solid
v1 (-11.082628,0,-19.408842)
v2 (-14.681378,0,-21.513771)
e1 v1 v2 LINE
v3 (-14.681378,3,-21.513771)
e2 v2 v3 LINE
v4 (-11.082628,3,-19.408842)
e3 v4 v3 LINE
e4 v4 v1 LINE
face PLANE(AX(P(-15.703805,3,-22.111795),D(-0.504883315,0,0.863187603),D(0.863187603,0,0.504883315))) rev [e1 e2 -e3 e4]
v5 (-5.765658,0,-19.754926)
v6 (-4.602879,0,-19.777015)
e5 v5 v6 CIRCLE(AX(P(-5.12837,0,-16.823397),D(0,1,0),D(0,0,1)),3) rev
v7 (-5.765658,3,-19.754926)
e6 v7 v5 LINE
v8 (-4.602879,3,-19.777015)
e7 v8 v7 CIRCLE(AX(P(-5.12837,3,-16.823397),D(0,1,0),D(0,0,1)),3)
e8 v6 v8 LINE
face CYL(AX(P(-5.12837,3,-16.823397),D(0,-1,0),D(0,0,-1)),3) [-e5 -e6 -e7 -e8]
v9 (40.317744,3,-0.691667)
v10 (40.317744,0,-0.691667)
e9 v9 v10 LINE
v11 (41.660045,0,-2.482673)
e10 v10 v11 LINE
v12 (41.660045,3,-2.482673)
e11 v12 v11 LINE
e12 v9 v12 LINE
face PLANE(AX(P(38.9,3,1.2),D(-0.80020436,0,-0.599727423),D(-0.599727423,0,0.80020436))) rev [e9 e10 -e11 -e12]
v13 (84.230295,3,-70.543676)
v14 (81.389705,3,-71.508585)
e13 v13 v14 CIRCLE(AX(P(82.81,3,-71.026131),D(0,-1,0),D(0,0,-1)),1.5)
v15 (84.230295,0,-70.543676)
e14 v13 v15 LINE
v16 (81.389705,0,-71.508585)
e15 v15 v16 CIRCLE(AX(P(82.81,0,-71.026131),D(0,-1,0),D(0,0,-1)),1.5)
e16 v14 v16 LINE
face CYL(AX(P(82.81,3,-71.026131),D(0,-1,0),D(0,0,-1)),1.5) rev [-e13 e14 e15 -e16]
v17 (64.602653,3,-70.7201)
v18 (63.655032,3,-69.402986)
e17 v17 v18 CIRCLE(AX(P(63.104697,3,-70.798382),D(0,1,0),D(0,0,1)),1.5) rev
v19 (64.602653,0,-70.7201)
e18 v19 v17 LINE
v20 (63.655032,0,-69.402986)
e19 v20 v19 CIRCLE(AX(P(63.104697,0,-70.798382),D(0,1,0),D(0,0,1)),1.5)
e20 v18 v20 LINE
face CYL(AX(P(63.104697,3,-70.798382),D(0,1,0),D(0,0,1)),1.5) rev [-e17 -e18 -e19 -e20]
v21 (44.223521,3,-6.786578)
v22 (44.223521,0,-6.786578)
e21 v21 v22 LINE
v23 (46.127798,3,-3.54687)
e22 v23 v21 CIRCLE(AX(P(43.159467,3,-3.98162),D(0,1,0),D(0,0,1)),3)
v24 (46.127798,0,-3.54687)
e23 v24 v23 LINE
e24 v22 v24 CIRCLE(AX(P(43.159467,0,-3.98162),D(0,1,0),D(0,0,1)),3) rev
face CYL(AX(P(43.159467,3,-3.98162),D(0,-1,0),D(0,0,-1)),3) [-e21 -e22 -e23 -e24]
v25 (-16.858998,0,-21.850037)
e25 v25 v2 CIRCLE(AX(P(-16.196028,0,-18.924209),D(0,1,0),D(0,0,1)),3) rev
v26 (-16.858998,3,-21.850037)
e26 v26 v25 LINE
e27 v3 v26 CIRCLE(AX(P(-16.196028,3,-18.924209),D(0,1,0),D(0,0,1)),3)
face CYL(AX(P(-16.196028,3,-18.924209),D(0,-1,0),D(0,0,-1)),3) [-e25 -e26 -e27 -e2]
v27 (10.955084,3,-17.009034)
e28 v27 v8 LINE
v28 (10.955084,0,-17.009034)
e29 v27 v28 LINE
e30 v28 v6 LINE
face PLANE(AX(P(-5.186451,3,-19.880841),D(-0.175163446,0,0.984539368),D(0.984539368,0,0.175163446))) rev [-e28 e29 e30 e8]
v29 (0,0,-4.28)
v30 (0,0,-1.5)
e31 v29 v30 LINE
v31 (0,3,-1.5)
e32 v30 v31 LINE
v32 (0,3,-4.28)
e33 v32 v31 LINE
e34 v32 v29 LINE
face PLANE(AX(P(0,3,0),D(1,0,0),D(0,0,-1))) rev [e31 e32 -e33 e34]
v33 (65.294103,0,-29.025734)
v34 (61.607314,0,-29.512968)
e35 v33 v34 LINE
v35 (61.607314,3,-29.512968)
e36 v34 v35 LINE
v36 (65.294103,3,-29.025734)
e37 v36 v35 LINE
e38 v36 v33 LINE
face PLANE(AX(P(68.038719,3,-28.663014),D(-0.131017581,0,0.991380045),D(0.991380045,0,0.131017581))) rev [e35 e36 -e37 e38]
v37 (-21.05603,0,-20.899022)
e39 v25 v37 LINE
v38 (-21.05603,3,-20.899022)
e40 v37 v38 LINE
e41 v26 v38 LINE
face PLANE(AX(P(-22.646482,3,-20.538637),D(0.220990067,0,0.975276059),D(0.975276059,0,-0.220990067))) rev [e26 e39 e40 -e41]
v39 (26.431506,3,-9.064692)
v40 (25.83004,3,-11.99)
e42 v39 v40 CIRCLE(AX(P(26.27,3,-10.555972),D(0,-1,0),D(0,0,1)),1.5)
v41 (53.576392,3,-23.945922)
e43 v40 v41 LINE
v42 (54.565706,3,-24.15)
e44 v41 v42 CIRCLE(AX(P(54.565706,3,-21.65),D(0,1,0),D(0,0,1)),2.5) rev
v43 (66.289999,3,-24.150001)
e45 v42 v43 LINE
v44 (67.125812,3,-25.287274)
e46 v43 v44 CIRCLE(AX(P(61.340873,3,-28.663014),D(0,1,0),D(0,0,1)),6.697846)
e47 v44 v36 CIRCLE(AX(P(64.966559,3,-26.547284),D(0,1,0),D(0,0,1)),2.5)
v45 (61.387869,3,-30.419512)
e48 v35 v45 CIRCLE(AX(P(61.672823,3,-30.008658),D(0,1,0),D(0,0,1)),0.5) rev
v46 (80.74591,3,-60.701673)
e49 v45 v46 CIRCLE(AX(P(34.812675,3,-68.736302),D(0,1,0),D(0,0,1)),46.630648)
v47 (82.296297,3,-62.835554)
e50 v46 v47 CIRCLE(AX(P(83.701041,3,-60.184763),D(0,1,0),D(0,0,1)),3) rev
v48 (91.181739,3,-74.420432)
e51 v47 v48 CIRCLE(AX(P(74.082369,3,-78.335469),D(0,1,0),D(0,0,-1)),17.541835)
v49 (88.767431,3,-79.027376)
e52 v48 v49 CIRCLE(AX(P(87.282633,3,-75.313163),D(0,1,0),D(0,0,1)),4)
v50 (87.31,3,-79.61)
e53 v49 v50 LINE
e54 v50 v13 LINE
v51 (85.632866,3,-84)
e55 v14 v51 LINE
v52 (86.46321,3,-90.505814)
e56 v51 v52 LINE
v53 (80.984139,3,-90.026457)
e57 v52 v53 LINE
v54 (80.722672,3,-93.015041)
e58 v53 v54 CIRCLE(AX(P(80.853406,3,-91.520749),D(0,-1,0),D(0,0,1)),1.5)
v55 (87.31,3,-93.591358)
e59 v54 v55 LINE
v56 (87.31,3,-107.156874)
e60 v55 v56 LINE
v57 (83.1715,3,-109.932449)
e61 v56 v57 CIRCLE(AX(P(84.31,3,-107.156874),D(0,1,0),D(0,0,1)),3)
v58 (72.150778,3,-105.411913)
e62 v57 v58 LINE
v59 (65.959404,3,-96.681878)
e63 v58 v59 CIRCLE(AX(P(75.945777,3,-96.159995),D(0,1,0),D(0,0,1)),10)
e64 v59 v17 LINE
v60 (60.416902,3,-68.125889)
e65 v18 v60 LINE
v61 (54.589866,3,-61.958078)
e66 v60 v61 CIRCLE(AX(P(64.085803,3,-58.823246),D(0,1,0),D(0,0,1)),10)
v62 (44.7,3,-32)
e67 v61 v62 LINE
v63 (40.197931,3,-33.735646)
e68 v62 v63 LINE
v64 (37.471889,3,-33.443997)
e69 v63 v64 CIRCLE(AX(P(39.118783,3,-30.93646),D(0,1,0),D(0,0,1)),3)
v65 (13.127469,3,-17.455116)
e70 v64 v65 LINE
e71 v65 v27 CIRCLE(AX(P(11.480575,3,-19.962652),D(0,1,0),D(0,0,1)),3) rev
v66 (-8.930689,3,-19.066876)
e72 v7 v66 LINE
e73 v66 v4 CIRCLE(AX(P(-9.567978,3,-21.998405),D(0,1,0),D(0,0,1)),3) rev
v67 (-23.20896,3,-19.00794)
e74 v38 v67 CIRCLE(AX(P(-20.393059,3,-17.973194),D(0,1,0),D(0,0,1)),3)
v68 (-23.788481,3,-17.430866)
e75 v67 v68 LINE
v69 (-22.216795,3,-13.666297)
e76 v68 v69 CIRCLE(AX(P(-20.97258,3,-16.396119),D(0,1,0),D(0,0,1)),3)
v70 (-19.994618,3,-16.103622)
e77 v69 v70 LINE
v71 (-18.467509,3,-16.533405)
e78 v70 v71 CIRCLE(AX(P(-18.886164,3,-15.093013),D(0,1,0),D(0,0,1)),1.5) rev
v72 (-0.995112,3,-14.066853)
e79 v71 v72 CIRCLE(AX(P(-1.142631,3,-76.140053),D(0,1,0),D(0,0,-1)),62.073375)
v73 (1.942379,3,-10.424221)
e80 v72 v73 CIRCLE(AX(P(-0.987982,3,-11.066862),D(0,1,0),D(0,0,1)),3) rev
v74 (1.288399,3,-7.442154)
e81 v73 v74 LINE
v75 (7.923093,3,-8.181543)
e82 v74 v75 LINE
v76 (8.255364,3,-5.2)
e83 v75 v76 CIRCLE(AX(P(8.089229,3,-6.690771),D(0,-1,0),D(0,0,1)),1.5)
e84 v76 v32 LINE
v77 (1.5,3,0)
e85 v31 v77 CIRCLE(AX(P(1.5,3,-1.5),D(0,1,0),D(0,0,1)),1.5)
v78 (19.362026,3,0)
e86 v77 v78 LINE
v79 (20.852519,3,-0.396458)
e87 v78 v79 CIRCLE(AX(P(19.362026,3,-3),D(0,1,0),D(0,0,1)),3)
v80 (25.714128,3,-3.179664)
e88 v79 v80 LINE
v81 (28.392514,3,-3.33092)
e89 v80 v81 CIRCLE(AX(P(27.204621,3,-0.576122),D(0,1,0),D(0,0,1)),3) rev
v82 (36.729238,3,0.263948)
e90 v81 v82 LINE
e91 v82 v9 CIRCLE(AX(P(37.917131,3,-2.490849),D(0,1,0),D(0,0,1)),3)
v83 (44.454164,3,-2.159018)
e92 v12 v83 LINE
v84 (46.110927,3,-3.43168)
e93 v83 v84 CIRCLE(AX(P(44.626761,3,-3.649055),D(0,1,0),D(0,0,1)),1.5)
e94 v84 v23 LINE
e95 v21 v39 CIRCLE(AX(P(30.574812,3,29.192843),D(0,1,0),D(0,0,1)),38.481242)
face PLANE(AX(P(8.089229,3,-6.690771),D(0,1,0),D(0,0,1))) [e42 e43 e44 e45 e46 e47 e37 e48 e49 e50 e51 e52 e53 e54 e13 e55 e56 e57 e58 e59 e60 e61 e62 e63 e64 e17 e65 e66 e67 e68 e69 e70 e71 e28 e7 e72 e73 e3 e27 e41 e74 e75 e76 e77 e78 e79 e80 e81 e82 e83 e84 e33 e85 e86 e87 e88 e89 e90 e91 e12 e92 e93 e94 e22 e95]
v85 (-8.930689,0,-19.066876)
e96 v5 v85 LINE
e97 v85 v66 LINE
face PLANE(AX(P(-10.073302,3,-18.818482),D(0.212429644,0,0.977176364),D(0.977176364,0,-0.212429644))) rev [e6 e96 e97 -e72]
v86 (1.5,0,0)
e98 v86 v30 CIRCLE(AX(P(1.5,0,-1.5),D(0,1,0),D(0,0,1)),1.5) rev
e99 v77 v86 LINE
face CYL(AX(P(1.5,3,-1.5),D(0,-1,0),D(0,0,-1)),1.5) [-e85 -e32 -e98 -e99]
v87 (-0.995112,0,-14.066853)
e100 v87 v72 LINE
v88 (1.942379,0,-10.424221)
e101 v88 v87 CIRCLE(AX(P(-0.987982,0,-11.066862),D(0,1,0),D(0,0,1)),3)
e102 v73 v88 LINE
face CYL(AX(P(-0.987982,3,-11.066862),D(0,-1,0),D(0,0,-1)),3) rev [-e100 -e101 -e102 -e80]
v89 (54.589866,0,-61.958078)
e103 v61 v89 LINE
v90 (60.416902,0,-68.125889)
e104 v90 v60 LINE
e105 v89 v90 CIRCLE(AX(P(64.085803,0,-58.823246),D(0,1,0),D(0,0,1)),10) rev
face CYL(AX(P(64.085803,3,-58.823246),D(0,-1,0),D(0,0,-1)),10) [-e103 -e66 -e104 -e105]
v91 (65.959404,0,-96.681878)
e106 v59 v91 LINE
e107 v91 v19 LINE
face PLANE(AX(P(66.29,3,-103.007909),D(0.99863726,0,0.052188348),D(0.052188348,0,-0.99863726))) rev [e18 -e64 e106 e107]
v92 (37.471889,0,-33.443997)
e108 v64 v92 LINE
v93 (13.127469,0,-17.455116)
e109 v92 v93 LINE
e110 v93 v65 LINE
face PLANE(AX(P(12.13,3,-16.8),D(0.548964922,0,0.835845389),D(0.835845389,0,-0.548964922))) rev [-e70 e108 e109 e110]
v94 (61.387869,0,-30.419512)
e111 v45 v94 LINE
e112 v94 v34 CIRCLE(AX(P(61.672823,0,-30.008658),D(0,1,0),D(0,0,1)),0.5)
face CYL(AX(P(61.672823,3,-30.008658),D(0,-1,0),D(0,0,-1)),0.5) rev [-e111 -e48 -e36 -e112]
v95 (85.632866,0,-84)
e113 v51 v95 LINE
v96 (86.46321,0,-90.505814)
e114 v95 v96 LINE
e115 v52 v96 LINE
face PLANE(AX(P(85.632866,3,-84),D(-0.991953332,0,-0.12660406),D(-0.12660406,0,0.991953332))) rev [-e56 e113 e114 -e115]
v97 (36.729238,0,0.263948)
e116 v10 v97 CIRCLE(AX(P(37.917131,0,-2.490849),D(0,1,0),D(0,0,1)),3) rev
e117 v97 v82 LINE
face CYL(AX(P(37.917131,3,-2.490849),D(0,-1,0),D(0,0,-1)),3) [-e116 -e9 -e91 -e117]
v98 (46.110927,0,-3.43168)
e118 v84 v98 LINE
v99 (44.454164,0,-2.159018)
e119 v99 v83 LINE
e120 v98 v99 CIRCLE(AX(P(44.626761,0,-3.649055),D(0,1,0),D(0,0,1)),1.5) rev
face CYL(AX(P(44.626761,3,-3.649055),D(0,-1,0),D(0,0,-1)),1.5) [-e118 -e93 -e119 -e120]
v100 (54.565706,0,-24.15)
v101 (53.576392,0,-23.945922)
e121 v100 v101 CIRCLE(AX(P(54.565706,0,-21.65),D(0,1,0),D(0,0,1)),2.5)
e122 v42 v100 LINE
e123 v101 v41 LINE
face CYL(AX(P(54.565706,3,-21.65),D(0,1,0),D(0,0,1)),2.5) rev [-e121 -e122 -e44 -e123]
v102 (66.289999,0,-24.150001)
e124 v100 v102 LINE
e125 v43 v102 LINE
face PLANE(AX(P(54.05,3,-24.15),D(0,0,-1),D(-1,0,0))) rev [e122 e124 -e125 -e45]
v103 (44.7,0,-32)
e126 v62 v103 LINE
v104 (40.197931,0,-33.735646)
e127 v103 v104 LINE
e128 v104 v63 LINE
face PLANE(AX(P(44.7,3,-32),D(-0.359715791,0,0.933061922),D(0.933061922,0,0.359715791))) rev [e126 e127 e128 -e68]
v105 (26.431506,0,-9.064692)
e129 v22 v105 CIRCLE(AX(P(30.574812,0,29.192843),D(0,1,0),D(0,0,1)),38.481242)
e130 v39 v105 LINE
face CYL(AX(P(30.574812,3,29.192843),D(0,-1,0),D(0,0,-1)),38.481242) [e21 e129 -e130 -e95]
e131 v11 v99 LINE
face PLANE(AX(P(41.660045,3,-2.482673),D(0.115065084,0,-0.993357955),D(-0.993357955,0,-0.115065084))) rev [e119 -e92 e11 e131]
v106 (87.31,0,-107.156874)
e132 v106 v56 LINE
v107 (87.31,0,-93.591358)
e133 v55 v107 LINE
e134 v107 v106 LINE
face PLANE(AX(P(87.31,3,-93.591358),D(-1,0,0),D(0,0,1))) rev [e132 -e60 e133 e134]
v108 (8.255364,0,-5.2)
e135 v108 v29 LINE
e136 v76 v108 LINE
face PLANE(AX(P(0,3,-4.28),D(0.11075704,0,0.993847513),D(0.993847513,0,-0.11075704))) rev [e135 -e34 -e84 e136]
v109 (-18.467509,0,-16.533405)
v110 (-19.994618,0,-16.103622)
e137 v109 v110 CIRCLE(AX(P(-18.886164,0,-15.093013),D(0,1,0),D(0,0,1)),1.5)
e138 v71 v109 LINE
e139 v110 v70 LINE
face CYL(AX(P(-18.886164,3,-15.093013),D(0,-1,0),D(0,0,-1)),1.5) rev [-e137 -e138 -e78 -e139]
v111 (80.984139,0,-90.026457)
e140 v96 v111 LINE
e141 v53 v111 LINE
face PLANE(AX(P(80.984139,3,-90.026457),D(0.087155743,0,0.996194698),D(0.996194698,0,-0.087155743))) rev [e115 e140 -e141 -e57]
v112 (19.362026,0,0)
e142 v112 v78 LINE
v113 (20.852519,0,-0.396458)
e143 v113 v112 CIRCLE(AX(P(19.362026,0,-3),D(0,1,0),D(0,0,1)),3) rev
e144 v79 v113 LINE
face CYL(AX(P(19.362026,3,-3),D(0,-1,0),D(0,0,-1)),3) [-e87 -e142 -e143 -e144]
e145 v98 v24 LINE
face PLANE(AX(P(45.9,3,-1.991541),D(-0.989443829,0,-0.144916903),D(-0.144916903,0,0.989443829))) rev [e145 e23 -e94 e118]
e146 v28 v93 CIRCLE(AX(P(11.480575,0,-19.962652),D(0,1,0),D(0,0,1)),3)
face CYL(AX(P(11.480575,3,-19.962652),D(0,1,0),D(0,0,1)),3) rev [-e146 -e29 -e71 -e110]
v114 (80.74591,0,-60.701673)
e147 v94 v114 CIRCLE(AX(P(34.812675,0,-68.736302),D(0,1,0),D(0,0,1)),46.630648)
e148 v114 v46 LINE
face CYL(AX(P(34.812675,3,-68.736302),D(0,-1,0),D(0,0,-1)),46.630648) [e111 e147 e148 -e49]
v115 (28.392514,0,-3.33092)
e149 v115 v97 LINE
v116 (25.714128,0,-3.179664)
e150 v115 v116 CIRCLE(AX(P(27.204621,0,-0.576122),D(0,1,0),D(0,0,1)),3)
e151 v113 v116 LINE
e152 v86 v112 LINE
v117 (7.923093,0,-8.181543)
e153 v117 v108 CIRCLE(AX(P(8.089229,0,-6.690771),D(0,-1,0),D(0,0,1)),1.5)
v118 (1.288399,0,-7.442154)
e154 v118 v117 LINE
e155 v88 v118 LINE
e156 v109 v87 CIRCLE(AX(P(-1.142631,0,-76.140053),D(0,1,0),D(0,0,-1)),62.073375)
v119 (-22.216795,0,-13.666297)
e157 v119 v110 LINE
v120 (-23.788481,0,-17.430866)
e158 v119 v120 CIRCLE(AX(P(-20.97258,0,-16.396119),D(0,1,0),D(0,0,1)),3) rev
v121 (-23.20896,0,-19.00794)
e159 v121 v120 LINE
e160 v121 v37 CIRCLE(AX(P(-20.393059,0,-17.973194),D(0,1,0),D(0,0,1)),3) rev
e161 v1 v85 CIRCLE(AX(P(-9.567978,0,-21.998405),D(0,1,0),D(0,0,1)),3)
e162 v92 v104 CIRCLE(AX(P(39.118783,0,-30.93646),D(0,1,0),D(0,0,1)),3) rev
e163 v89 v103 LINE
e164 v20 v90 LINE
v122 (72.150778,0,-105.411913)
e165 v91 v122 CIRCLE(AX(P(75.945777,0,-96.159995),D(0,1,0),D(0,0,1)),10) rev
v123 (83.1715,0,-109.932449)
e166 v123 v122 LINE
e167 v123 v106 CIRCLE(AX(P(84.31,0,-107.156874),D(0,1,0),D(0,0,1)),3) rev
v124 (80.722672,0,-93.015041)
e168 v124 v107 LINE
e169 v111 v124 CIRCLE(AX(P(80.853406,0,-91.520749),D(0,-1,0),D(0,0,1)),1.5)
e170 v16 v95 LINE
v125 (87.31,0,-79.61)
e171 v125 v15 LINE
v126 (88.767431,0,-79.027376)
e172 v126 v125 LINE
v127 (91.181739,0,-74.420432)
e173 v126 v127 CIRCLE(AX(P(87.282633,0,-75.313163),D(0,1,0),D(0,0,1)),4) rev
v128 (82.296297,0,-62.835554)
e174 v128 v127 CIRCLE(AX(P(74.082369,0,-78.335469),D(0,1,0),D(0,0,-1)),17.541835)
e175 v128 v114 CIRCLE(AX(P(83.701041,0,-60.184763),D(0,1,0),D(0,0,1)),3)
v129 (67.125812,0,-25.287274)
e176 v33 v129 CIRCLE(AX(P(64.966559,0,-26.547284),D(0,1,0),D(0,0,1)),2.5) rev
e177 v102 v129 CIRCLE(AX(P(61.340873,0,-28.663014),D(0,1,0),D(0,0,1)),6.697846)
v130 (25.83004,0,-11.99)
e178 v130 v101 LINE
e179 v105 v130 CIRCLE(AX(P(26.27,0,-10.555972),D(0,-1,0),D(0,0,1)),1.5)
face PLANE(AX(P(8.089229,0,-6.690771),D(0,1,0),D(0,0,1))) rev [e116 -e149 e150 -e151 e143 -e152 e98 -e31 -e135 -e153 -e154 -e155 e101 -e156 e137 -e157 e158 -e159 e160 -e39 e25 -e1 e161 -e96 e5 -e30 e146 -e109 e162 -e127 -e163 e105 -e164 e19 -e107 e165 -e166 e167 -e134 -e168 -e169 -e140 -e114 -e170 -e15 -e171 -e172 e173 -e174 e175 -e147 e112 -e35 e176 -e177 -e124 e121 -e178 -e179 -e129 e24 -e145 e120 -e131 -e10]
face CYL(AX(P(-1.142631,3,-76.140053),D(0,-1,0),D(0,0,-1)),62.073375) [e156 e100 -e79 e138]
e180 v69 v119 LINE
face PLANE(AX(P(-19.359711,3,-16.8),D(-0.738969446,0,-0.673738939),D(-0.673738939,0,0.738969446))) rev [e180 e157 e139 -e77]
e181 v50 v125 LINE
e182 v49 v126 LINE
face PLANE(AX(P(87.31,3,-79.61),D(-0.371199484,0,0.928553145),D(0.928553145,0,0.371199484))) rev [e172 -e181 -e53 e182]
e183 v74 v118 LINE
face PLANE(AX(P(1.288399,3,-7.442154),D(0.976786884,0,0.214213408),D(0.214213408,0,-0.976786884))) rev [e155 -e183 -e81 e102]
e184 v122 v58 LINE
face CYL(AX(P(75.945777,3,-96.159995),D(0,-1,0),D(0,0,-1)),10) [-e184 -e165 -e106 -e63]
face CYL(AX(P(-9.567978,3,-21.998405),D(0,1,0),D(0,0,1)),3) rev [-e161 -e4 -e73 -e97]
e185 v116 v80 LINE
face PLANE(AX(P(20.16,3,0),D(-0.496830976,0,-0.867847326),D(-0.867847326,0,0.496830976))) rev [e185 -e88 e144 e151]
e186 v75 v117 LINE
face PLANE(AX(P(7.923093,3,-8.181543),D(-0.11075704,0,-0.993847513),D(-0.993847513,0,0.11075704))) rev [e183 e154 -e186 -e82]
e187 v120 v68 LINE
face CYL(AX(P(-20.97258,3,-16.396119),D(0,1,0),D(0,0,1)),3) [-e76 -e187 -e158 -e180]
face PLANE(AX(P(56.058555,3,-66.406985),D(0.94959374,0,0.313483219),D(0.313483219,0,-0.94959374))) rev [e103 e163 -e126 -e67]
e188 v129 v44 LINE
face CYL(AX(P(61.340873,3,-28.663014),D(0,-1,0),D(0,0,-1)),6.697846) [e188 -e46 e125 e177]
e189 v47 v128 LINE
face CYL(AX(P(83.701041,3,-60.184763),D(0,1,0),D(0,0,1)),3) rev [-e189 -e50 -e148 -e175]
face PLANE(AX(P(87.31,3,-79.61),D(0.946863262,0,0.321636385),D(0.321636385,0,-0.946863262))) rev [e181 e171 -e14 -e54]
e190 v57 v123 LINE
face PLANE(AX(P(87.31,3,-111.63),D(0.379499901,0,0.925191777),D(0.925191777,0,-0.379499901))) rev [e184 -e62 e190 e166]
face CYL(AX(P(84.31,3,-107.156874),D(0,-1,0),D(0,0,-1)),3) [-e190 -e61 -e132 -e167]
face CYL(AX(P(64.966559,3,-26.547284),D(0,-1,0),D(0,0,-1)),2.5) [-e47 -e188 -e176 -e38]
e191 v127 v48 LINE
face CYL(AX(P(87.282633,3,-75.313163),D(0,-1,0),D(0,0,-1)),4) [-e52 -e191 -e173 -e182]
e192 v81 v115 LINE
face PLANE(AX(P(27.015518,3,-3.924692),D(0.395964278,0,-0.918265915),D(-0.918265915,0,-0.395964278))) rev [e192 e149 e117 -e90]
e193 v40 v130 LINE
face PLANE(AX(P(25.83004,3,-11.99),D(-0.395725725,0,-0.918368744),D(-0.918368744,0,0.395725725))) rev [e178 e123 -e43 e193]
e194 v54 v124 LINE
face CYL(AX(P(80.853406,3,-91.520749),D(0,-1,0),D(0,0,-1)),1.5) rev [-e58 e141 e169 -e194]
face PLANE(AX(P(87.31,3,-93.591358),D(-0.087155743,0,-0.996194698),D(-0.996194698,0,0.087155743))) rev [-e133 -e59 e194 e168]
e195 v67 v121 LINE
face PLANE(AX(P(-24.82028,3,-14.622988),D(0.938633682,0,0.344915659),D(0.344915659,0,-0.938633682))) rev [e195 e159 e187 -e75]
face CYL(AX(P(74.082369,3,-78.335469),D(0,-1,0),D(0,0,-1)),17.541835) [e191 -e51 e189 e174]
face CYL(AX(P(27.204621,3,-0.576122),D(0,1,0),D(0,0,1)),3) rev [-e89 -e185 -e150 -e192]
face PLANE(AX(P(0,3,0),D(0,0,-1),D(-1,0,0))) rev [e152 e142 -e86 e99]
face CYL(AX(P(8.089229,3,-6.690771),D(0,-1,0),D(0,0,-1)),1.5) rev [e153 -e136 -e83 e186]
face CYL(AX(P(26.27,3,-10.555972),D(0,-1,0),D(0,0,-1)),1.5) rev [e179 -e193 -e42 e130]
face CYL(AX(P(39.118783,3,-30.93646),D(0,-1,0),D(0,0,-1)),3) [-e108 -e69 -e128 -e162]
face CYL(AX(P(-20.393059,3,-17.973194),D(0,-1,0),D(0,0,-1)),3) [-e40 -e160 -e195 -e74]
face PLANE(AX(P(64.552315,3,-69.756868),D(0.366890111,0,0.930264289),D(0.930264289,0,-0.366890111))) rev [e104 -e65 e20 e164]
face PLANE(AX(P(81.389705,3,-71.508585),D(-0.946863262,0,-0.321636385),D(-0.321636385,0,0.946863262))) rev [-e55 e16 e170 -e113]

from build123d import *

# Parameters (mm, degrees)
BOSS_EXTRUDE1_DEPTH = 3
FILLET1_R           = 3
FILLET2_R           = 1.5
FILLET3_R           = 10
FILLET4_R           = 3
FILLET5_R           = 4
FILLET6_R           = 2.5
FILLET7_R           = 0.5


with BuildPart() as part:
    # Sketch3 → Boss-Extrude1 (new body)
    with BuildSketch(Plane(origin=(0, 0, 0), x_dir=(1, 0, 0), z_dir=(0, 1, 0))):
        with BuildLine():
            Line((7.923093171, 8.181542538), (1.28839884, 7.442154357))
            Line((1.28839884, 7.442154357), (2.76822933, 14.19))
            ThreePointArc((2.76822933, 14.19), (-8.413807268, 14.494015924), (-19.359710867, 16.8))
            Line((-19.359710867, 16.8), (-22.216794933, 13.666296862))
            Line((-22.216794933, 13.666296862), (-24.820279869, 14.62298821))
            Line((-24.820279869, 14.62298821), (-22.646481841, 20.53863742))
            Line((-22.646481841, 20.53863742), (-15.703804617, 22.111794774))
            Line((-15.703804617, 22.111794774), (-10.073302156, 18.818482014))
            Line((-10.073302156, 18.818482014), (-5.186450964, 19.880840969))
            Line((-5.186450964, 19.880840969), (12.13, 16.8))
            Line((12.13, 16.8), (38.76, 34.29))
            Line((38.76, 34.29), (44.7, 32))
            Line((44.7, 32), (56.058554748, 66.4069852))
            Line((56.058554748, 66.4069852), (64.552315124, 69.756868371))
            Line((64.552315124, 69.756868371), (66.29, 103.00790875))
            Line((66.29, 103.00790875), (87.31, 111.63))
            Line((87.31, 111.63), (87.31, 93.591357519))
            Line((87.31, 93.591357519), (80.722672152, 93.01504101))
            ThreePointArc((80.722672152, 93.01504101), (79.359113719, 91.390015348), (80.984139381, 90.026456915))
            Line((80.984139381, 90.026456915), (86.46321022, 90.505813501))
            Line((86.46321022, 90.505813501), (85.632866314, 84))
            Line((85.632866314, 84), (81.389705108, 71.508585308))
            ThreePointArc((81.389705108, 71.508585308), (82.327545423, 69.605835839), (84.230294892, 70.543676154))
            Line((84.230294892, 70.543676154), (87.31, 79.61))
            Line((87.31, 79.61), (91.618486592, 77.887634392))
            ThreePointArc((91.618486592, 77.887634392), (88.600013238, 68.48894743), (80.984139381, 62.208424889))
            ThreePointArc((80.984139381, 62.208424889), (74.158506271, 43.709858628), (60.297831214, 29.686025056))
            Line((60.297831214, 29.686025056), (68.03871852, 28.66301442))
            ThreePointArc((68.03871852, 28.66301442), (67.586257486, 26.243028794), (66.29, 24.15))
            Line((66.29, 24.15), (54.05, 24.15))
            Line((54.05, 24.15), (25.830040494, 11.99))
            ThreePointArc((25.830040494, 11.99), (24.800734775, 10.253880031), (26.431506195, 9.064692331))
            ThreePointArc((26.431506195, 9.064692331), (36.664028635, 8.803570476), (46.46571567, 5.854056721))
            Line((46.46571567, 5.854056721), (45.9, 1.991540554))
            Line((45.9, 1.991540554), (41.660045255, 2.482673431))
            Line((41.660045255, 2.482673431), (38.9, -1.2))
            Line((38.9, -1.2), (27.015518097, 3.924692331))
            Line((27.015518097, 3.924692331), (20.16, 0))
            Line((20.16, 0), (0, 0))
            Line((0, 0), (0, 4.28))
            Line((0, 4.28), (8.255364291, 5.2))
            ThreePointArc((8.255364291, 5.2), (9.58, 6.856906829), (7.923093171, 8.181542538))
        make_face()
    extrude(amount=BOSS_EXTRUDE1_DEPTH)

    # Fillet1
    # the kernel refuses this fillet: 3 mm, written as the material it adds along each edge
    with BuildSketch(Plane(origin=(80.984139381, 0, -62.208424889), x_dir=(0.9022478681487618, 0, -0.4312177923289046), z_dir=(0, 1, 0))) as fillet1_piece_1:
        with BuildLine():
            CenterArc((1.578679862, -2.997421373), FILLET1_R, 92.37575888, 52.157589609)
            ThreePointArc((-0.864680258, -1.256734347), (-0.427200708, -0.631903288), (0, 0))
            ThreePointArc((0, 0), (0.72716053, -0.015077949), (1.45432106, 0))
        make_face()
    extrude(amount=3)
    with BuildSketch(Plane(origin=(27.015518097, 0, -3.924692331), x_dir=(0.9182659150547935, 0, 0.39596427774305953), z_dir=(0, 1, 0))) as fillet1_piece_2:
        with BuildLine():
            CenterArc((FILLET1_R * 0.49985366711, -FILLET1_R), FILLET1_R, 90, 53.116686758)
            Line((-FILLET1_R * 0.300005823165, -FILLET1_R * 0.399812699386), (0, 0))
            Line((0, 0), (FILLET1_R * 0.49985366711, 0))
        make_face()
    extrude(amount=3)
    with BuildSketch(Plane(origin=(12.13, 0, -16.8), x_dir=(-0.9845393680489544, 0, -0.17516344584919966), z_dir=(0, 1, 0))) as fillet1_piece_3:
        with BuildLine():
            CenterArc((FILLET1_R * 0.397788634748, -FILLET1_R), FILLET1_R, 90, 43.384200988)
            Line((-FILLET1_R * 0.289098500769, -FILLET1_R * 0.273235895863), (0, 0))
            Line((0, 0), (FILLET1_R * 0.397788634748, 0))
        make_face()
    extrude(amount=3)
    with BuildSketch(Plane(origin=(-10.073302156, 0, -18.818482014), x_dir=(-0.863187603129405, 0, -0.5048833150379528), z_dir=(0, 1, 0))) as fillet1_piece_4:
        with BuildLine():
            CenterArc((FILLET1_R * 0.389766900576, -FILLET1_R), FILLET1_R, 90, 42.58838059)
            Line((-FILLET1_R * 0.286959776942, -FILLET1_R * 0.263765659633), (0, 0))
            Line((0, 0), (FILLET1_R * 0.389766900576, 0))
        make_face()
    extrude(amount=3)
    with BuildSketch(Plane(origin=(2.76822933, 0, -14.19), x_dir=(-0.21421340809022724, 0, 0.9767868835085624), z_dir=(0, 1, 0))) as fillet1_piece_5:
        with BuildLine():
            CenterArc((3.855271405, -3), FILLET1_R, 90, 102.505548925)
            ThreePointArc((0.926446282, -3.649602493), (0.490902504, -1.81777488), (0, 0))
            Line((0, 0), (3.855271405, 0))
        make_face()
    extrude(amount=3)
    # the kernel refuses this fillet: 3 mm, written as the material it takes off along each edge
    with BuildSketch(Plane(origin=(-24.820279869, -7.478630688, -14.62298821), x_dir=(0.9386336815677853, 0, 0.3449156590044952), z_dir=(0, 1, 0))) as fillet1_2_piece_1:
        with BuildLine():
            CenterArc((3, 2.991452275), FILLET1_R, 180, 85.673811508)
            Line((0, 2.991452275), (0, 0))
            Line((0, 0), (2.773696477, 0))
        make_face()
    extrude(amount=17.957261376, mode=Mode.SUBTRACT)
    with BuildSketch(Plane(origin=(20.16, -1.994934097, 0), x_dir=(0.8678473261649016, 0, -0.4968309757537575), z_dir=(0, 1, 0))) as fillet1_2_piece_2:
        with BuildLine():
            CenterArc((FILLET1_R * 0.265991212876, FILLET1_R), FILLET1_R, 240.209440415, 29.790559585)
            Line((-FILLET1_R * 0.230839762878, FILLET1_R * 0.132152673835), (0, 0))
            Line((0, 0), (FILLET1_R * 0.265991212876, 0))
        make_face()
    extrude(amount=6.989868193, mode=Mode.SUBTRACT)
    with BuildSketch(Plane(origin=(46.46571567, -6.070952348, -5.854056721), x_dir=(-0.9233291277987619, 0, -0.38400953342121286), z_dir=(0, 1, 0))) as fillet1_2_piece_3:
        with BuildLine():
            CenterArc((2.333722575, 2.99850626), FILLET1_R, 194.249797413, 77.558344276)
            Line((-0.573972765, 2.260056662), (0, 0))
            ThreePointArc((0, 0), (1.21419047, -0.019160317), (2.428380939, 0))
        make_face()
    extrude(amount=15.141904695, mode=Mode.SUBTRACT)
    with BuildSketch(Plane(origin=(38.9, -5.909950036, 1.2), x_dir=(0.5997274231965581, 0, -0.8002043600643629), z_dir=(0, 1, 0))) as fillet1_2_piece_4:
        with BuildLine():
            CenterArc((FILLET1_R * 0.78799333809, FILLET1_R), FILLET1_R, 193.524251091, 76.475748909)
            Line((-FILLET1_R * 0.184277686804, FILLET1_R * 0.766143090435), (0, 0))
            Line((0, 0), (FILLET1_R * 0.78799333809, 0))
        make_face()
    extrude(amount=14.819900071, mode=Mode.SUBTRACT)
    with BuildSketch(Plane(origin=(38.76, -3.852720436, -34.29), x_dir=(-0.8358453893738872, 0, 0.5489649215226915), z_dir=(0, 1, 0))) as fillet1_2_piece_5:
        with BuildLine():
            CenterArc((FILLET1_R * 0.513696058133, FILLET1_R), FILLET1_R, 215.621225969, 54.378774031)
            Line((-FILLET1_R * 0.299188992069, FILLET1_R * 0.417575846005), (0, 0))
            Line((0, 0), (FILLET1_R * 0.513696058133, 0))
        make_face()
    extrude(amount=10.705440872, mode=Mode.SUBTRACT)
    with BuildSketch(Plane(origin=(-5.186450964, -1.481839662, -19.880840969), x_dir=(-0.9771763639228005, 0, 0.2124296443310458), z_dir=(0, 1, 0))) as fillet1_2_piece_6:
        with BuildLine():
            CenterArc((FILLET1_R * 0.197578621542, FILLET1_R), FILLET1_R, 247.647056489, 22.352943511)
            Line((-FILLET1_R * 0.18273230535, FILLET1_R * 0.0751413086926), (0, 0))
            Line((0, 0), (FILLET1_R * 0.197578621542, 0))
        make_face()
    extrude(amount=5.963679323, mode=Mode.SUBTRACT)
    with BuildSketch(Plane(origin=(-15.703804617, -2.961195523, -22.111794774), x_dir=(-0.975276058531981, 0, 0.22099006686800218), z_dir=(0, 1, 0))) as fillet1_2_piece_7:
        with BuildLine():
            CenterArc((FILLET1_R * 0.394826069747, FILLET1_R), FILLET1_R, 226.909202107, 43.090797893)
            Line((-FILLET1_R * 0.288330425897, FILLET1_R * 0.269727994197), (0, 0))
            Line((0, 0), (FILLET1_R * 0.394826069747, 0))
        make_face()
    extrude(amount=8.922391046, mode=Mode.SUBTRACT)
    with BuildSketch(Plane(origin=(-22.646481841, -4.076928403, -20.53863742), x_dir=(-0.3449156590044966, 0, 0.9386336815677849), z_dir=(0, 1, 0))) as fillet1_2_piece_8:
        with BuildLine():
            CenterArc((FILLET1_R * 0.543590453695, FILLET1_R), FILLET1_R, 212.943838396, 57.056161604)
            Line((-FILLET1_R * 0.295613569123, FILLET1_R * 0.456183295506), (0, 0))
            Line((0, 0), (FILLET1_R * 0.543590453695, 0))
        make_face()
    extrude(amount=11.153856805, mode=Mode.SUBTRACT)

    # Fillet2
    fillet2_edges = [part.edges().sort_by_distance(p)[0] for p in [
        (-19.359710867, 1.5, -16.8),
        (64.552315124, 1.5, -69.756868371),
        (45.9, 1.5, -1.991540554),
        (0, 1.5, 0),
    ]]
    fillet(fillet2_edges, radius=FILLET2_R)

    # Fillet3
    fillet3_edges = [part.edges().sort_by_distance(p)[0] for p in [
        (56.058554748, 1.5, -66.4069852),
        (66.29, 1.5, -103.00790875),
    ]]
    fillet(fillet3_edges, radius=FILLET3_R)

    # Fillet4
    fillet4_edges = [part.edges().sort_by_distance(p)[0] for p in [
        (87.31, 1.5, -111.63),
    ]]
    fillet(fillet4_edges, radius=FILLET4_R)

    # Fillet5
    fillet5_edges = [part.edges().sort_by_distance(p)[0] for p in [
        (91.618486592, 1.5, -77.887634392),
    ]]
    fillet(fillet5_edges, radius=FILLET5_R)

    # Fillet6
    fillet6_edges = [part.edges().sort_by_distance(p)[0] for p in [
        (68.03871852, 1.5, -28.66301442),
        (54.05, 1.5, -24.15),
    ]]
    fillet(fillet6_edges, radius=FILLET6_R)

    # Fillet7
    fillet7_edges = [part.edges().sort_by_distance(p)[0] for p in [
        (60.297831214, 1.5, -29.686025056),
    ]]
    fillet(fillet7_edges, radius=FILLET7_R)


solid = part.part
